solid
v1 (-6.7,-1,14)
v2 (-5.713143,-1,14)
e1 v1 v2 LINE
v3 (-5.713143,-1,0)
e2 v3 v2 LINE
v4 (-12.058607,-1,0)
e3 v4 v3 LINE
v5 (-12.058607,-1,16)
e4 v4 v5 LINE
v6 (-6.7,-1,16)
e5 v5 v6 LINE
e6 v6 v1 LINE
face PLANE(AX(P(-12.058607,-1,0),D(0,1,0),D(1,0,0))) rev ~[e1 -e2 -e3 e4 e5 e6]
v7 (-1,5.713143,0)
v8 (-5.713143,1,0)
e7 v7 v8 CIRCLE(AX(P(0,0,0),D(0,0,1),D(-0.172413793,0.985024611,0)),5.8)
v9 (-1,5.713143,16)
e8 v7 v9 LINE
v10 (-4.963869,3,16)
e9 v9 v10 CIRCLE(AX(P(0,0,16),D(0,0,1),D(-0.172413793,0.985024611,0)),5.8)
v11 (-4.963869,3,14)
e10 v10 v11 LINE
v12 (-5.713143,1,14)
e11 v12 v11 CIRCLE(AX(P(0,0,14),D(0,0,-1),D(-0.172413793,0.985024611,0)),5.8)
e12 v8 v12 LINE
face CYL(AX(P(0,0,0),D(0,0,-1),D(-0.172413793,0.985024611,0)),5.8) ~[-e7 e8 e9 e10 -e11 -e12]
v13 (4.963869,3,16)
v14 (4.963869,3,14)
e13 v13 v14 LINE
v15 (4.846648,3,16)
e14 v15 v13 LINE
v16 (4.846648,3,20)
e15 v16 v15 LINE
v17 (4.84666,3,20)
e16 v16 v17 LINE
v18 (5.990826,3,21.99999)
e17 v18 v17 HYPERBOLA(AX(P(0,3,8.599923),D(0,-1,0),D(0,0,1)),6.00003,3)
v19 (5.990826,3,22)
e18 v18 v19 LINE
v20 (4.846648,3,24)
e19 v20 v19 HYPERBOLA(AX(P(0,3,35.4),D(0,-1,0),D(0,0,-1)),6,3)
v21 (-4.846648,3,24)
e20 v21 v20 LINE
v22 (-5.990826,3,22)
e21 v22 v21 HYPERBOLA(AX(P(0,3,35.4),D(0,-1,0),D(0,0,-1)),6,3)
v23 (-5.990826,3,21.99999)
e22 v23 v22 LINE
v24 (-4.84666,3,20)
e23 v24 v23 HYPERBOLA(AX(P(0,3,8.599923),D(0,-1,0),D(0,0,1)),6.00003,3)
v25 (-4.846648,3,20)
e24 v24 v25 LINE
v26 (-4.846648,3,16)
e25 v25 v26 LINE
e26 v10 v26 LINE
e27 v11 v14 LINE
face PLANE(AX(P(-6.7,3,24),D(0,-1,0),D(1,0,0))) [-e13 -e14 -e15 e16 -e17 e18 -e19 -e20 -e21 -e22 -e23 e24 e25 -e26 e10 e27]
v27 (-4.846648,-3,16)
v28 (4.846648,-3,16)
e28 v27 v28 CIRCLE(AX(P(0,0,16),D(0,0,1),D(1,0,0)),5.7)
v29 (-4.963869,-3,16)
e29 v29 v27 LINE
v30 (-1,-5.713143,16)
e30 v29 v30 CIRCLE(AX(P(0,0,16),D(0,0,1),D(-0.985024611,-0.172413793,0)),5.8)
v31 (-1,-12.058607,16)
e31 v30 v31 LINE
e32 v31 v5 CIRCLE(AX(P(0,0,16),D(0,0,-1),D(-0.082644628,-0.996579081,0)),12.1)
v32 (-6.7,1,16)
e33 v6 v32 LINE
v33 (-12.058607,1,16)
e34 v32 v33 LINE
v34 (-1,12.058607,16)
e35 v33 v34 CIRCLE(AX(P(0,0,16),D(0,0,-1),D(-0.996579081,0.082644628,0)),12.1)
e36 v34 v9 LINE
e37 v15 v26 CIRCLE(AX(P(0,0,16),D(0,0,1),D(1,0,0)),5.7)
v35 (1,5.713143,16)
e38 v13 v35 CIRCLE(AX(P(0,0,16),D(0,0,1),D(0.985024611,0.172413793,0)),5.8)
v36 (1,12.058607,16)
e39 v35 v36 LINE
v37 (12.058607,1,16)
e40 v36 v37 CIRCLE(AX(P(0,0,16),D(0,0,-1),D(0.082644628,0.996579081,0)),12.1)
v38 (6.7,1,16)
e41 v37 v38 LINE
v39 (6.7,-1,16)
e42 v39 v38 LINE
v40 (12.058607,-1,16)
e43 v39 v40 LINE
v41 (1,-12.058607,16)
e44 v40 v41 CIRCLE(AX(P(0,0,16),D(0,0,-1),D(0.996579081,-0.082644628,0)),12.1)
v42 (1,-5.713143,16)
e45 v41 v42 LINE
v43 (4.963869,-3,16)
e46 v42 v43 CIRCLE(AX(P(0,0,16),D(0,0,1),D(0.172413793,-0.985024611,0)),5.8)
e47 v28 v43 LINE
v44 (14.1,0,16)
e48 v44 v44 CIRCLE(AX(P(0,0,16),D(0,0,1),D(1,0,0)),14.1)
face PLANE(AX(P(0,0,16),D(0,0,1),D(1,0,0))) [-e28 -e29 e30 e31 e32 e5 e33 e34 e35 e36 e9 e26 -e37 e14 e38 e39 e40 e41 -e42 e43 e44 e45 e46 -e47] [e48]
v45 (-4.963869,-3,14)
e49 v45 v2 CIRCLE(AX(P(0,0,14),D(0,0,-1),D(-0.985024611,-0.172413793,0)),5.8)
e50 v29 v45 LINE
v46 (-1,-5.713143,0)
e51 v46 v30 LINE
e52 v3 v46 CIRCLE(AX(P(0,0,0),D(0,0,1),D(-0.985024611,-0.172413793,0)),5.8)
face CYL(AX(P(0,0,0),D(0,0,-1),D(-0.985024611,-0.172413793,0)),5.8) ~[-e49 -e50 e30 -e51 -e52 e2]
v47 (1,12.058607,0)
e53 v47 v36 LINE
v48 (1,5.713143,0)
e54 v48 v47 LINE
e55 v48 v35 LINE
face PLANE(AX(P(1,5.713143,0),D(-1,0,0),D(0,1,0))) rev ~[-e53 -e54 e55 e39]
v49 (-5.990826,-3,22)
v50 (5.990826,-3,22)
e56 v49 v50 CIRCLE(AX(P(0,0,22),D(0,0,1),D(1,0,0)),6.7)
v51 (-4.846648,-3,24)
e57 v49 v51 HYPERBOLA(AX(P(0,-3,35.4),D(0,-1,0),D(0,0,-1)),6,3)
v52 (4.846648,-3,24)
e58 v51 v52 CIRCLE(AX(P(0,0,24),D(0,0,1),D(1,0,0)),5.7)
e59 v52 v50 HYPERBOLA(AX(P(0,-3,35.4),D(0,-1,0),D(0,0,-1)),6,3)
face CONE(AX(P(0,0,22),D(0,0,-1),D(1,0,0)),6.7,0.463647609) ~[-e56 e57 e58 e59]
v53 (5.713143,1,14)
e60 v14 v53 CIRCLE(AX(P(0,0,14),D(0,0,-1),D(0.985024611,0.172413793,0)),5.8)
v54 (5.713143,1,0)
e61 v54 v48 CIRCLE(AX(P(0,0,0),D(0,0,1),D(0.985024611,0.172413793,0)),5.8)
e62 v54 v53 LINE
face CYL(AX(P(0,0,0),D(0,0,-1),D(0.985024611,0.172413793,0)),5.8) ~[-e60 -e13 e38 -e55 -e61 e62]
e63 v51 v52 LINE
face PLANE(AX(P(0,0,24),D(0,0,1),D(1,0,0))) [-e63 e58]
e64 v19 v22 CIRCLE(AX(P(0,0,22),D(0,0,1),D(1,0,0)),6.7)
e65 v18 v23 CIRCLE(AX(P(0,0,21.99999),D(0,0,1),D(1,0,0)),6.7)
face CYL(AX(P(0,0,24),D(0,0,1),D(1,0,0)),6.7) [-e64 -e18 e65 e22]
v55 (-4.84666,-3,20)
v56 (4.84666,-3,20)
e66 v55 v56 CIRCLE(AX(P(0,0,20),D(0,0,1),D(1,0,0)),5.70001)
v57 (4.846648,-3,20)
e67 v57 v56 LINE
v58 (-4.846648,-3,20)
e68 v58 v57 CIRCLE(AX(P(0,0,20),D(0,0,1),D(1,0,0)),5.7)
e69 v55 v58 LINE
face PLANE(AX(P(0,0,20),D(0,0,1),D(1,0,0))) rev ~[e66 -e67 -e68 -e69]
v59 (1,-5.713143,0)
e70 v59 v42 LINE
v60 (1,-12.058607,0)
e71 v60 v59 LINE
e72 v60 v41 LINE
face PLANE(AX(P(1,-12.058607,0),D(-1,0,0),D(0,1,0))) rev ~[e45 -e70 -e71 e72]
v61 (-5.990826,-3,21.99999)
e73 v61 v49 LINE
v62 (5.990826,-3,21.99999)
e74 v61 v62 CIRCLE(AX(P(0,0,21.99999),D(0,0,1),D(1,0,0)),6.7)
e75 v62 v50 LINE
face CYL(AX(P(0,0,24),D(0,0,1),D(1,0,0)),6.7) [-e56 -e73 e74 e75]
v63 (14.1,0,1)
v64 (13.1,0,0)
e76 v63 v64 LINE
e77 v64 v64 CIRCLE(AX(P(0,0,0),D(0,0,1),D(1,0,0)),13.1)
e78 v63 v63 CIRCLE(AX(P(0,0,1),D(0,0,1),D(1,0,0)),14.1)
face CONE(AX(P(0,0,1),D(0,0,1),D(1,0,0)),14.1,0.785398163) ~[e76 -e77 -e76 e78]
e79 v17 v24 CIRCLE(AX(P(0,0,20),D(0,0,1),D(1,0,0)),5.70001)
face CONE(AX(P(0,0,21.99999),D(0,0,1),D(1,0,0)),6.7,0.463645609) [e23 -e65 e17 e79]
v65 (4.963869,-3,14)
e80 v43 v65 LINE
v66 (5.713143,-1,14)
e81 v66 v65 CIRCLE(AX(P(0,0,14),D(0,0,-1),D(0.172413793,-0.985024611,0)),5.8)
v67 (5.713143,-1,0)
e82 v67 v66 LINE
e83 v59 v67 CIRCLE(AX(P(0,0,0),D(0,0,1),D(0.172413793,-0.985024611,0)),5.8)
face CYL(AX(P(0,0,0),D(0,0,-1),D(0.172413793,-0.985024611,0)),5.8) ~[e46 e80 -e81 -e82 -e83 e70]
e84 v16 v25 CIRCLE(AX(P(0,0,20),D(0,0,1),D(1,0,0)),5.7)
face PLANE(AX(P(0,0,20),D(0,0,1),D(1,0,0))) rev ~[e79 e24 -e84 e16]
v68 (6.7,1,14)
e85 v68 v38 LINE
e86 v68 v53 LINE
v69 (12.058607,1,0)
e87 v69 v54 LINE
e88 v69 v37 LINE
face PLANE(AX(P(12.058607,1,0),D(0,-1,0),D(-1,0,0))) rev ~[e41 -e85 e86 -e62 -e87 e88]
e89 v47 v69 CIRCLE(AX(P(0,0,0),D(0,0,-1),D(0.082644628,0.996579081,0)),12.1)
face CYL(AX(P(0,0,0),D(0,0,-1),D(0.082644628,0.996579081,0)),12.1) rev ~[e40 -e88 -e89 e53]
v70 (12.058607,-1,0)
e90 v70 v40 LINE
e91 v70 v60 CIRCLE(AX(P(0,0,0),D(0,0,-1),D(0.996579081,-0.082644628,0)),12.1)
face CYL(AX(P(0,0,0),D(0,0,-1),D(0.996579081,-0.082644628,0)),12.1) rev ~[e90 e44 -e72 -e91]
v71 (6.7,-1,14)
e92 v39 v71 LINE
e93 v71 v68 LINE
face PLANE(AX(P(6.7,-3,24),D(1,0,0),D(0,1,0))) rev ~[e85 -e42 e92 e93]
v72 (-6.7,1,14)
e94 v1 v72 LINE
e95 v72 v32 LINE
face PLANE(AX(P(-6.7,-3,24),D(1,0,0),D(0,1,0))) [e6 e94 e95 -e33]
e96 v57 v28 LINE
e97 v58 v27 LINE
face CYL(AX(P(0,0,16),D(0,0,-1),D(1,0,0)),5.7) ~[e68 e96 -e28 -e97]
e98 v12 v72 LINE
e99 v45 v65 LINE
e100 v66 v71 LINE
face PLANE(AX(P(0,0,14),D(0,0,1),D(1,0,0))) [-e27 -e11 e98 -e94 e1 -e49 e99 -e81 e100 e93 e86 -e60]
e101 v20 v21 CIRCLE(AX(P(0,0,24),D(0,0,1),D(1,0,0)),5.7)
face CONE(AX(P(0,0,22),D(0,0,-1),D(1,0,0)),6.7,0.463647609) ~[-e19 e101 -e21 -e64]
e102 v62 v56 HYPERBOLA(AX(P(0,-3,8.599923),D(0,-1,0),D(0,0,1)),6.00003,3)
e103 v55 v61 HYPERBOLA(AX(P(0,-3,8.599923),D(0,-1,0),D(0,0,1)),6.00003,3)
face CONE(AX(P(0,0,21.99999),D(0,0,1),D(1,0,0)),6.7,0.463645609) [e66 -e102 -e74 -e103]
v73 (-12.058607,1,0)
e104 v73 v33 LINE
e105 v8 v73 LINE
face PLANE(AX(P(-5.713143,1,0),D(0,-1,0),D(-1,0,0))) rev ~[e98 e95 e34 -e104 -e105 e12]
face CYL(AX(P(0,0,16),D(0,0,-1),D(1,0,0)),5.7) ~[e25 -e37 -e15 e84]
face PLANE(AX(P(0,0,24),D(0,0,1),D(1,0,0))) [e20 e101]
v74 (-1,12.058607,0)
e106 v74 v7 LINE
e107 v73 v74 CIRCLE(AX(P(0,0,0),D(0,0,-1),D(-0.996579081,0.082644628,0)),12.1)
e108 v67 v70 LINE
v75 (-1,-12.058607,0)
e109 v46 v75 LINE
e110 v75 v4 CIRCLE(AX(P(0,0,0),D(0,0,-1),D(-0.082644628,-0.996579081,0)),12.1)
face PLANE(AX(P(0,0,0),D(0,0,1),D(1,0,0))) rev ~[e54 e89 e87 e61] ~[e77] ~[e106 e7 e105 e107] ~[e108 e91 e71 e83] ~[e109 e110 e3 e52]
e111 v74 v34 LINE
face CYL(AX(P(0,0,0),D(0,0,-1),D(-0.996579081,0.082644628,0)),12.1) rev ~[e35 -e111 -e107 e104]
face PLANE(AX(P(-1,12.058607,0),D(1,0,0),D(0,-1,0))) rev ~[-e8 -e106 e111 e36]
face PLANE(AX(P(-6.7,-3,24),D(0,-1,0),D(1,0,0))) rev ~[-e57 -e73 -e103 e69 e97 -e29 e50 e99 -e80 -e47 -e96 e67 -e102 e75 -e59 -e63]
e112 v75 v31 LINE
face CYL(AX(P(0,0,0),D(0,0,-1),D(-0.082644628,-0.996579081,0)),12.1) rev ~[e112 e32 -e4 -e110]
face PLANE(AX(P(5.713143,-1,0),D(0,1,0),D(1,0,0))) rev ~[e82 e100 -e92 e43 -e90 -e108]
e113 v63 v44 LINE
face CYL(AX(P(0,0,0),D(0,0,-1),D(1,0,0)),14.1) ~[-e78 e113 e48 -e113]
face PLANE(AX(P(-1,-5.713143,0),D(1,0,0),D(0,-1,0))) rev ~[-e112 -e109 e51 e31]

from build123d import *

# Parameters (mm, degrees)
F0_R       = 14.1
F1_DEPTH   = 16
F2_SIZE    = 1
F3_R       = 5.7
F4_DEPTH   = 8
F5_R       = 6.7
F5_R_2     = 5.7
F6_DEPTH   = 4
F7_SIZE2   = 2
F7_SIZE    = 1
F7_2_SIZE2 = 1.99999
F7_2_SIZE  = 0.99999
F8_W       = 13.4
F8_H       = 6
F9_DEPTH   = 10


# Not quite as in the source:
# - a fillet or chamfer is up to 0.001 mm smaller than in the source, because OpenCascade refuses the exact size


with BuildPart() as f1:
    # F0 (on Top) → F1 (new body)
    with BuildSketch(Plane.XY):
        Circle(F0_R)
        with BuildLine():
            Line((-12.0586068847, -1), (-5.7131427428, -1))
            ThreePointArc((-5.7131427428, -1), (-4.1012193309, -4.1012193309), (-1, -5.7131427428))
            Line((-1, -5.7131427428), (-1, -12.0586068847))
            ThreePointArc((-1, -12.0586068847), (-8.5559920524, -8.5559920524), (-12.0586068847, -1))
        make_face(mode=Mode.SUBTRACT)
        with BuildLine():
            ThreePointArc((12.0586068847, -1), (8.5559920524, -8.5559920524), (1, -12.0586068847))
            Line((1, -12.0586068847), (1, -5.7131427428))
            ThreePointArc((1, -5.7131427428), (4.1012193309, -4.1012193309), (5.7131427428, -1))
            Line((5.7131427428, -1), (12.0586068847, -1))
        make_face(mode=Mode.SUBTRACT)
        with BuildLine():
            ThreePointArc((-12.0586068847, 1), (-8.5559920524, 8.5559920524), (-1, 12.0586068847))
            Line((-1, 12.0586068847), (-1, 5.7131427428))
            ThreePointArc((-1, 5.7131427428), (-4.1012193309, 4.1012193309), (-5.7131427428, 1))
            Line((-5.7131427428, 1), (-12.0586068847, 1))
        make_face(mode=Mode.SUBTRACT)
        with BuildLine():
            Line((12.0586068847, 1), (5.7131427428, 1))
            ThreePointArc((5.7131427428, 1), (4.1012193309, 4.1012193309), (1, 5.7131427428))
            Line((1, 5.7131427428), (1, 12.0586068847))
            ThreePointArc((1, 12.0586068847), (8.5559920524, 8.5559920524), (12.0586068847, 1))
        make_face(mode=Mode.SUBTRACT)
    extrude(amount=F1_DEPTH)

    # F2
    f2_edges = [f1.edges().sort_by_distance(p)[0] for p in [
        (-14.1, 0, 0),
    ]]
    chamfer(f2_edges, length=F2_SIZE)

    # F3 (on face) → F4 (join)
    with BuildSketch(Plane.XY.offset(16)):
        Circle(F3_R)
    extrude(amount=F4_DEPTH)

    # F5 (on face) → F6 (join)
    with BuildSketch(Plane.XY.offset(24)):
        Circle(F5_R)
        Circle(F5_R_2, mode=Mode.SUBTRACT)
    extrude(amount=-F6_DEPTH)

    # F7
    f7_edges = [f1.edges().sort_by_distance(p)[0] for p in [
        (-6.7, 0, 24),
    ]]
    f7_side = f1.faces().sort_by_distance((0, 0, 24))[0]
    chamfer(f7_edges, length=F7_SIZE, length2=F7_SIZE2, reference=f7_side)

    # F7#2 (size 1 and 2 in the source; OpenCascade refuses exactly that, so slightly less here)
    f7_2_edges = [f1.edges().sort_by_distance(p)[0] for p in [
        (-6.7, 0, 20),
    ]]
    f7_2_side = f1.faces().sort_by_distance((-6.510495, 0, 20))[0]
    chamfer(f7_2_edges, length=F7_2_SIZE, length2=F7_2_SIZE2, reference=f7_2_side)

    # F8 (on face) → F9 (cut)
    with BuildSketch(Plane.XY.offset(24)):
        Rectangle(F8_W, F8_H)
    extrude(amount=-F9_DEPTH, mode=Mode.SUBTRACT)


solid = f1.part
